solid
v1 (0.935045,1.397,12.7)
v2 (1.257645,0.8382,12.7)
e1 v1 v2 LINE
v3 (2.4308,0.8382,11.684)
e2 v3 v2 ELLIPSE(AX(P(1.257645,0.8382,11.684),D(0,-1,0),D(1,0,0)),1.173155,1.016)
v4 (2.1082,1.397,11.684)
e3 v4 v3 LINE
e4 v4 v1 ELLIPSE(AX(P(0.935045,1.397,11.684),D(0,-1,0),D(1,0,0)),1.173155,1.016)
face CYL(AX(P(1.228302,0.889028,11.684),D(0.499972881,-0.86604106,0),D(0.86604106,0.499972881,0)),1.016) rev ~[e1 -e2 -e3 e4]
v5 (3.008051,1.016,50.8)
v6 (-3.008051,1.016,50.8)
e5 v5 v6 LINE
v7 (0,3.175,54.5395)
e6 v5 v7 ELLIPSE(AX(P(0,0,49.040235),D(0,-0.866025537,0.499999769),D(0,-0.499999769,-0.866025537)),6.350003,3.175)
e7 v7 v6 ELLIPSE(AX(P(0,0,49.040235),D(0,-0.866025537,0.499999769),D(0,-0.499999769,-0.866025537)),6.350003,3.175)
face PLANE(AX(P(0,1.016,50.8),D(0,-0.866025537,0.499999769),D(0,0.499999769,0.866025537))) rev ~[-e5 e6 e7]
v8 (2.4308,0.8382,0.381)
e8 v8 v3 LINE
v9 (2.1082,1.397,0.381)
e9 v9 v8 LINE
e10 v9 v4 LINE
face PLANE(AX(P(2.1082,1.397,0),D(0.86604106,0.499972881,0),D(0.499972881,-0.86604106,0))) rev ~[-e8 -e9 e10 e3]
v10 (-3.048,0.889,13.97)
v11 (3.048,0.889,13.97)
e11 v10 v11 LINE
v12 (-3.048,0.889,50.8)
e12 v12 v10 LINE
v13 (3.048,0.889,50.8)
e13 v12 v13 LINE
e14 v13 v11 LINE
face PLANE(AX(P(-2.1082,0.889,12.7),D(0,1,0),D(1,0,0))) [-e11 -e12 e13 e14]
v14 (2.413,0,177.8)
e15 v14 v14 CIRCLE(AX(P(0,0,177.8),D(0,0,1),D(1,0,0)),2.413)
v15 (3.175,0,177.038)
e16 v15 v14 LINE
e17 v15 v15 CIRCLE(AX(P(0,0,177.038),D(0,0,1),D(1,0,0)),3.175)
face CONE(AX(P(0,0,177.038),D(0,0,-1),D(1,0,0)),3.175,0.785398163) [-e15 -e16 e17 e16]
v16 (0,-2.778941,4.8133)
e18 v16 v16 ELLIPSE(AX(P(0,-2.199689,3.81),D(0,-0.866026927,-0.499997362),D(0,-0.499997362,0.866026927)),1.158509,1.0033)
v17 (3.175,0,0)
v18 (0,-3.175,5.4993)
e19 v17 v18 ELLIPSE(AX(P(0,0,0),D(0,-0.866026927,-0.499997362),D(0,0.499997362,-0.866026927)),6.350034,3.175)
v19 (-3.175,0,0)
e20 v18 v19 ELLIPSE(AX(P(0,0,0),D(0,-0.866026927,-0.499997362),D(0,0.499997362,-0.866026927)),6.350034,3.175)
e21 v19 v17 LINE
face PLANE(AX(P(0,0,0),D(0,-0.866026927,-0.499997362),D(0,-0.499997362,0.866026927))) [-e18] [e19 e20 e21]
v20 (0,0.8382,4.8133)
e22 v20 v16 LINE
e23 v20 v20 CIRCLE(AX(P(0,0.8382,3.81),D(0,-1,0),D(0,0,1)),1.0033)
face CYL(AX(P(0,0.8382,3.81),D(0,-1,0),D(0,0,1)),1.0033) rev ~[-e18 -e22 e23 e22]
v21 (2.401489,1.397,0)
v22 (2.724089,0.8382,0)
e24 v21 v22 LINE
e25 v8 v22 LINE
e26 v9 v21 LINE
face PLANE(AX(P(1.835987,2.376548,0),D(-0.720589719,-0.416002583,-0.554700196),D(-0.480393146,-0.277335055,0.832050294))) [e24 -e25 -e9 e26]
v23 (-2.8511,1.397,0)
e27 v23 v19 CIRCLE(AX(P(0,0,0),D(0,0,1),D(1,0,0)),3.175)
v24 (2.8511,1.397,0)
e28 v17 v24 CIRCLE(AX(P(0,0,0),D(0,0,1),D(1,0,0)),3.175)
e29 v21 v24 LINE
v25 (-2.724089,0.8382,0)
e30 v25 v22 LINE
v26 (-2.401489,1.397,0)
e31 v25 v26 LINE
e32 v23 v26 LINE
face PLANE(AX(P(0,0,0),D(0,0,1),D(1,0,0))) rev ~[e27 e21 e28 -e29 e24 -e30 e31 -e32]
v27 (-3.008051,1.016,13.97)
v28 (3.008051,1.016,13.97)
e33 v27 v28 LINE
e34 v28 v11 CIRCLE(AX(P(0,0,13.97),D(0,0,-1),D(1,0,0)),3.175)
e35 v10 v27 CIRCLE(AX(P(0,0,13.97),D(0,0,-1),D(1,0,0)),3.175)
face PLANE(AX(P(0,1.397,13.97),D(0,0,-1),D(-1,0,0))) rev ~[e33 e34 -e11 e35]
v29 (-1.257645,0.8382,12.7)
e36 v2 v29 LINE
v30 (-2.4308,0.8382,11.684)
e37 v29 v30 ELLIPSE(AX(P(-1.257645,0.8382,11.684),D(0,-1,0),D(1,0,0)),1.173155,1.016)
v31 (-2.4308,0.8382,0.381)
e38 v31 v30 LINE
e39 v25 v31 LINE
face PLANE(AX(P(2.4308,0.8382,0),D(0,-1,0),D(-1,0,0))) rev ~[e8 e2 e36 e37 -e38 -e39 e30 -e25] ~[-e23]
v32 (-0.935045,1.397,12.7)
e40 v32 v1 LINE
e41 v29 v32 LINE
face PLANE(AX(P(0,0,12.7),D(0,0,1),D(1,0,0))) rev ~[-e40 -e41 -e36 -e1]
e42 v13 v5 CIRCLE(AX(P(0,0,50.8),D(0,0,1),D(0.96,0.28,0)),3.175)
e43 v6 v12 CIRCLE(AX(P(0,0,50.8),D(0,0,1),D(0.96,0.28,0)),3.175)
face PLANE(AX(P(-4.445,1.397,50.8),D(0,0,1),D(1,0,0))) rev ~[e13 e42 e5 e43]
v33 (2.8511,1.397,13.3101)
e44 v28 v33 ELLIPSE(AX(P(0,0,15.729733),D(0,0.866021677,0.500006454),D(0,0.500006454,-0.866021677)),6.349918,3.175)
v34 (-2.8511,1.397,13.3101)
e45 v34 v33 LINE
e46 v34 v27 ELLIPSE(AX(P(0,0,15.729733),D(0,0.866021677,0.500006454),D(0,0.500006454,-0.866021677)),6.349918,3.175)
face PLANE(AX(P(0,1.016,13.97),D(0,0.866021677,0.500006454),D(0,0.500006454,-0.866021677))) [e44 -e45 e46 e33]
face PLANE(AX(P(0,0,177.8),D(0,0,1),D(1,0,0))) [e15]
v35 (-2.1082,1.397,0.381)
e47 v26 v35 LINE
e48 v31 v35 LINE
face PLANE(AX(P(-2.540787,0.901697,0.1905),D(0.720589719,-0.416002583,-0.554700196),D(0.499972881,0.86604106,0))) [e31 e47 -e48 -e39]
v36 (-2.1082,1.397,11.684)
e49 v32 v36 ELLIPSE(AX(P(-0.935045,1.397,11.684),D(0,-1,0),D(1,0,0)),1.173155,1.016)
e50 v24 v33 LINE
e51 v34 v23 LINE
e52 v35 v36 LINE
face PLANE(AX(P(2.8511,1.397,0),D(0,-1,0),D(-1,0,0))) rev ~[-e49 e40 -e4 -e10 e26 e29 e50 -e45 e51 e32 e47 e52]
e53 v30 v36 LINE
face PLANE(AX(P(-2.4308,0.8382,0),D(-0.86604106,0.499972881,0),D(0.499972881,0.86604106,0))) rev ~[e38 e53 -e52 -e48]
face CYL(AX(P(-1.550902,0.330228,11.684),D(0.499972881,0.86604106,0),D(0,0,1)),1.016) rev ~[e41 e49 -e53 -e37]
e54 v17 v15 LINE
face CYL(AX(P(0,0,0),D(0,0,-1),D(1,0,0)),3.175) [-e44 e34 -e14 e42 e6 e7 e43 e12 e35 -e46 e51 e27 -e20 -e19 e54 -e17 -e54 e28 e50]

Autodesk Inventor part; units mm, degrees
ref_plane "YZ Plane" through (0, 0, 0) normal (1, 0, 0) x (0, 1, 0)
ref_plane "XZ Plane" through (0, 0, 0) normal (0, 1, 0) x (-1, 0, 0)
ref_plane "XY Plane" through (0, 0, 0) normal (0, 0, 1) x (1, 0, 0)
sketch "Sketch1" plane through (0, 0, 0) normal (0, 0, 1) x (1, 0, 0)
  circle A0 centre (0, 0) radius 3.175
  dimension "d0" = 6.35
extrude "Extrusion1" add sketch "Sketch1" along normal blind 177.8
sketch "Sketch2" plane through (0, 0, 0) normal (0, 0, 1) x (1, 0, 0)
  circle A0 centre (0, 0) radius 3.175 projected
  line L0 (2.5773, 1.8542) -> (-2.5773, 1.8542)
  line L1 (0, 4.445) -> (0, -4.445) projected
  line L2 (-4.445, 0) -> (4.445, 0) projected
  line L3 (2.8511, 1.397) -> (-2.8511, 1.397)
  line L4 (2.1082, 1.397) -> (2.4308, 0.8382)
  line L5 (2.4308, 0.8382) -> (-2.4308, 0.8382)
  line L6 (-2.4308, 0.8382) -> (-2.1082, 1.397)
  line L7 (0, 0) -> (0, 3.175)
  dimension "d6" = 1.397
  dimension "d9" = 60
  dimension "d10" = 4.2164
  dimension "d11" = 0.5588
  dimension "d40" = 0.4572
extrude "Extrusion3" cut sketch "Sketch2" along normal blind 12.7 contours L3 L1 L0 A0 | L1 L3 A0 L0
extrude "Extrusion4" cut sketch "Sketch2" along normal up to surface (12.7 mm away) contours L4 L5 L1 L3 | L5 L6 L3 L1
sketch "Sketch3" plane through (-2.4308, 0.8382, 12.7) normal (0, 1, 0) x (1, 0, 0)
  line L0 (0, 12.7) -> (4.8616, 12.7) projected
  line L1 (2.4308, 48.26) -> (2.4308, -200.66) projected
  point P0 (2.4308, 12.7)
  point P1 (2.4308, 8.89)
  dimension "d14" = 3.81
hole "Hole1" at (0, 0.8382, 3.81) direction (0, -1, 0) diameter 2.0066 end through all
sketch "Sketch4" plane through (0, 0, 0) normal (1, 0, 0) x (0, 1, 0)
  line L0 (0, 213.36) -> (0, -35.56) projected
  line L1 (-3.175, 0) -> (-3.175, 177.8) projected
  line L2 (0, 0) -> (-3.175, 5.4993)
  line L3 (-3.175, 5.4993) -> (-3.175, 0)
  line L4 (-3.175, 0) -> (0, 0)
  dimension "d23" = 30
extrude "Extrusion5" cut sketch "Sketch4" along normal mid plane 12.7
chamfer "Chamfer1" distance 0.254 distance2 0.381 1 edges at (-2.2695, 1.1176, 0) measured on face at (0.8103, 0.2794, 0)
chamfer "Chamfer2" distance 0.254 distance2 0.381 1 edges at (2.2695, 1.1176, 0) measured on face at (0.8103, 0.2794, 0)
chamfer "Chamfer3" distance 0.762 angle 45 1 edges at (-3.175, 0, 177.8)
extrude "Extrusion7" cut sketch "Sketch2" along normal blind 50.8 contours L3 L1 L0 A0 | L0 L1 A0 | L1 L0 A0 | L1 L3 A0 L0
sketch "Sketch6" plane through (-2.1082, 1.397, 12.7) normal (0, 1, 0) x (1, 0, 0)
  line L0 (-0.7429, -38.1) -> (4.9593, -38.1) projected
  line L1 (0, 0) -> (4.2164, 0) projected
  line L2 (2.1082, 48.26) -> (2.1082, -200.66) projected
  line L3 (8.3312, 12.7) -> (-4.1148, 12.7) projected
  line L4 (6.5532, -1.27) -> (-2.3368, -1.27)
  line L5 (-2.3368, -1.27) -> (-2.3368, -38.1)
  line L6 (-2.3368, -38.1) -> (6.5532, -38.1)
  line L7 (6.5532, -38.1) -> (6.5532, -1.27)
  line L8 (6.5532, -1.27) -> (-2.3368, -38.1) construction
  line L9 (-2.3368, -1.27) -> (6.5532, -38.1) construction
  point P0 (2.1082, 12.7)
  point P1 (2.1082, -19.685)
  dimension "d43" = 0
  dimension "d44" = 1.27
  dimension "d45" = 8.89
extrude "Extrusion8" cut sketch "Sketch6" against normal blind 0.508
sketch "Sketch8" plane through (-2.8511, 1.397, 13.97) normal (0, 1, 0) x (1, 0, 0)
  point P0 (2.8511, 13.97)
sketch "Sketch9" plane through (-2.1082, 1.397, 12.7) normal (0, 1, 0) x (1, 0, 0)
  point P0 (2.1082, 12.7)
sketch "Sketch10" plane through (-2.1082, 1.397, 12.7) normal (0, 1, 0) x (1, 0, 0)
  point P0 (2.1082, 12.7)
fillet "Fillet3" radius 1.016 2 edges at (-2.2695, 1.1176, 12.7) (2.2695, 1.1176, 12.7)
sketch "Sketch11" plane through (0, 0, 0) normal (1, 0, 0) x (0, 1, 0)
  line L0 (0.889, 13.97) -> (0.889, 50.8) projected
  line L1 (3.175, 50.8) -> (3.175, 177.038) projected
  line L2 (1.016, 50.8) -> (3.175, 54.5395)
  line L3 (0.889, 13.97) -> (1.397, 13.97) projected
  line L4 (-4.445, 0) -> (4.445, 0) projected
  line L5 (1.016, 13.97) -> (1.397, 13.3101)
  line L6 (1.397, 13.3101) -> (1.397, 13.97)
  line L7 (1.016, 13.97) -> (1.397, 13.97)
  line L8 (0.8382, 12.7) -> (1.397, 12.7) projected
  line L9 (3.175, 54.5395) -> (3.175, 50.8)
  line L10 (3.175, 50.8) -> (0.889, 50.8) projected
  line L11 (1.016, 50.8) -> (3.175, 50.8)
  point P0 (0, 0)
  dimension "d56" = 0.127
  dimension "d57" = 13.97
  dimension "d58" = 0.127
  dimension "d59" = 30
  dimension "d60" = 0.6101
extrude "Extrusion10" cut sketch "Sketch11" along normal mid plane 6.35
properties part number "J007778" material "ALUMINUM, 6061-T651"
